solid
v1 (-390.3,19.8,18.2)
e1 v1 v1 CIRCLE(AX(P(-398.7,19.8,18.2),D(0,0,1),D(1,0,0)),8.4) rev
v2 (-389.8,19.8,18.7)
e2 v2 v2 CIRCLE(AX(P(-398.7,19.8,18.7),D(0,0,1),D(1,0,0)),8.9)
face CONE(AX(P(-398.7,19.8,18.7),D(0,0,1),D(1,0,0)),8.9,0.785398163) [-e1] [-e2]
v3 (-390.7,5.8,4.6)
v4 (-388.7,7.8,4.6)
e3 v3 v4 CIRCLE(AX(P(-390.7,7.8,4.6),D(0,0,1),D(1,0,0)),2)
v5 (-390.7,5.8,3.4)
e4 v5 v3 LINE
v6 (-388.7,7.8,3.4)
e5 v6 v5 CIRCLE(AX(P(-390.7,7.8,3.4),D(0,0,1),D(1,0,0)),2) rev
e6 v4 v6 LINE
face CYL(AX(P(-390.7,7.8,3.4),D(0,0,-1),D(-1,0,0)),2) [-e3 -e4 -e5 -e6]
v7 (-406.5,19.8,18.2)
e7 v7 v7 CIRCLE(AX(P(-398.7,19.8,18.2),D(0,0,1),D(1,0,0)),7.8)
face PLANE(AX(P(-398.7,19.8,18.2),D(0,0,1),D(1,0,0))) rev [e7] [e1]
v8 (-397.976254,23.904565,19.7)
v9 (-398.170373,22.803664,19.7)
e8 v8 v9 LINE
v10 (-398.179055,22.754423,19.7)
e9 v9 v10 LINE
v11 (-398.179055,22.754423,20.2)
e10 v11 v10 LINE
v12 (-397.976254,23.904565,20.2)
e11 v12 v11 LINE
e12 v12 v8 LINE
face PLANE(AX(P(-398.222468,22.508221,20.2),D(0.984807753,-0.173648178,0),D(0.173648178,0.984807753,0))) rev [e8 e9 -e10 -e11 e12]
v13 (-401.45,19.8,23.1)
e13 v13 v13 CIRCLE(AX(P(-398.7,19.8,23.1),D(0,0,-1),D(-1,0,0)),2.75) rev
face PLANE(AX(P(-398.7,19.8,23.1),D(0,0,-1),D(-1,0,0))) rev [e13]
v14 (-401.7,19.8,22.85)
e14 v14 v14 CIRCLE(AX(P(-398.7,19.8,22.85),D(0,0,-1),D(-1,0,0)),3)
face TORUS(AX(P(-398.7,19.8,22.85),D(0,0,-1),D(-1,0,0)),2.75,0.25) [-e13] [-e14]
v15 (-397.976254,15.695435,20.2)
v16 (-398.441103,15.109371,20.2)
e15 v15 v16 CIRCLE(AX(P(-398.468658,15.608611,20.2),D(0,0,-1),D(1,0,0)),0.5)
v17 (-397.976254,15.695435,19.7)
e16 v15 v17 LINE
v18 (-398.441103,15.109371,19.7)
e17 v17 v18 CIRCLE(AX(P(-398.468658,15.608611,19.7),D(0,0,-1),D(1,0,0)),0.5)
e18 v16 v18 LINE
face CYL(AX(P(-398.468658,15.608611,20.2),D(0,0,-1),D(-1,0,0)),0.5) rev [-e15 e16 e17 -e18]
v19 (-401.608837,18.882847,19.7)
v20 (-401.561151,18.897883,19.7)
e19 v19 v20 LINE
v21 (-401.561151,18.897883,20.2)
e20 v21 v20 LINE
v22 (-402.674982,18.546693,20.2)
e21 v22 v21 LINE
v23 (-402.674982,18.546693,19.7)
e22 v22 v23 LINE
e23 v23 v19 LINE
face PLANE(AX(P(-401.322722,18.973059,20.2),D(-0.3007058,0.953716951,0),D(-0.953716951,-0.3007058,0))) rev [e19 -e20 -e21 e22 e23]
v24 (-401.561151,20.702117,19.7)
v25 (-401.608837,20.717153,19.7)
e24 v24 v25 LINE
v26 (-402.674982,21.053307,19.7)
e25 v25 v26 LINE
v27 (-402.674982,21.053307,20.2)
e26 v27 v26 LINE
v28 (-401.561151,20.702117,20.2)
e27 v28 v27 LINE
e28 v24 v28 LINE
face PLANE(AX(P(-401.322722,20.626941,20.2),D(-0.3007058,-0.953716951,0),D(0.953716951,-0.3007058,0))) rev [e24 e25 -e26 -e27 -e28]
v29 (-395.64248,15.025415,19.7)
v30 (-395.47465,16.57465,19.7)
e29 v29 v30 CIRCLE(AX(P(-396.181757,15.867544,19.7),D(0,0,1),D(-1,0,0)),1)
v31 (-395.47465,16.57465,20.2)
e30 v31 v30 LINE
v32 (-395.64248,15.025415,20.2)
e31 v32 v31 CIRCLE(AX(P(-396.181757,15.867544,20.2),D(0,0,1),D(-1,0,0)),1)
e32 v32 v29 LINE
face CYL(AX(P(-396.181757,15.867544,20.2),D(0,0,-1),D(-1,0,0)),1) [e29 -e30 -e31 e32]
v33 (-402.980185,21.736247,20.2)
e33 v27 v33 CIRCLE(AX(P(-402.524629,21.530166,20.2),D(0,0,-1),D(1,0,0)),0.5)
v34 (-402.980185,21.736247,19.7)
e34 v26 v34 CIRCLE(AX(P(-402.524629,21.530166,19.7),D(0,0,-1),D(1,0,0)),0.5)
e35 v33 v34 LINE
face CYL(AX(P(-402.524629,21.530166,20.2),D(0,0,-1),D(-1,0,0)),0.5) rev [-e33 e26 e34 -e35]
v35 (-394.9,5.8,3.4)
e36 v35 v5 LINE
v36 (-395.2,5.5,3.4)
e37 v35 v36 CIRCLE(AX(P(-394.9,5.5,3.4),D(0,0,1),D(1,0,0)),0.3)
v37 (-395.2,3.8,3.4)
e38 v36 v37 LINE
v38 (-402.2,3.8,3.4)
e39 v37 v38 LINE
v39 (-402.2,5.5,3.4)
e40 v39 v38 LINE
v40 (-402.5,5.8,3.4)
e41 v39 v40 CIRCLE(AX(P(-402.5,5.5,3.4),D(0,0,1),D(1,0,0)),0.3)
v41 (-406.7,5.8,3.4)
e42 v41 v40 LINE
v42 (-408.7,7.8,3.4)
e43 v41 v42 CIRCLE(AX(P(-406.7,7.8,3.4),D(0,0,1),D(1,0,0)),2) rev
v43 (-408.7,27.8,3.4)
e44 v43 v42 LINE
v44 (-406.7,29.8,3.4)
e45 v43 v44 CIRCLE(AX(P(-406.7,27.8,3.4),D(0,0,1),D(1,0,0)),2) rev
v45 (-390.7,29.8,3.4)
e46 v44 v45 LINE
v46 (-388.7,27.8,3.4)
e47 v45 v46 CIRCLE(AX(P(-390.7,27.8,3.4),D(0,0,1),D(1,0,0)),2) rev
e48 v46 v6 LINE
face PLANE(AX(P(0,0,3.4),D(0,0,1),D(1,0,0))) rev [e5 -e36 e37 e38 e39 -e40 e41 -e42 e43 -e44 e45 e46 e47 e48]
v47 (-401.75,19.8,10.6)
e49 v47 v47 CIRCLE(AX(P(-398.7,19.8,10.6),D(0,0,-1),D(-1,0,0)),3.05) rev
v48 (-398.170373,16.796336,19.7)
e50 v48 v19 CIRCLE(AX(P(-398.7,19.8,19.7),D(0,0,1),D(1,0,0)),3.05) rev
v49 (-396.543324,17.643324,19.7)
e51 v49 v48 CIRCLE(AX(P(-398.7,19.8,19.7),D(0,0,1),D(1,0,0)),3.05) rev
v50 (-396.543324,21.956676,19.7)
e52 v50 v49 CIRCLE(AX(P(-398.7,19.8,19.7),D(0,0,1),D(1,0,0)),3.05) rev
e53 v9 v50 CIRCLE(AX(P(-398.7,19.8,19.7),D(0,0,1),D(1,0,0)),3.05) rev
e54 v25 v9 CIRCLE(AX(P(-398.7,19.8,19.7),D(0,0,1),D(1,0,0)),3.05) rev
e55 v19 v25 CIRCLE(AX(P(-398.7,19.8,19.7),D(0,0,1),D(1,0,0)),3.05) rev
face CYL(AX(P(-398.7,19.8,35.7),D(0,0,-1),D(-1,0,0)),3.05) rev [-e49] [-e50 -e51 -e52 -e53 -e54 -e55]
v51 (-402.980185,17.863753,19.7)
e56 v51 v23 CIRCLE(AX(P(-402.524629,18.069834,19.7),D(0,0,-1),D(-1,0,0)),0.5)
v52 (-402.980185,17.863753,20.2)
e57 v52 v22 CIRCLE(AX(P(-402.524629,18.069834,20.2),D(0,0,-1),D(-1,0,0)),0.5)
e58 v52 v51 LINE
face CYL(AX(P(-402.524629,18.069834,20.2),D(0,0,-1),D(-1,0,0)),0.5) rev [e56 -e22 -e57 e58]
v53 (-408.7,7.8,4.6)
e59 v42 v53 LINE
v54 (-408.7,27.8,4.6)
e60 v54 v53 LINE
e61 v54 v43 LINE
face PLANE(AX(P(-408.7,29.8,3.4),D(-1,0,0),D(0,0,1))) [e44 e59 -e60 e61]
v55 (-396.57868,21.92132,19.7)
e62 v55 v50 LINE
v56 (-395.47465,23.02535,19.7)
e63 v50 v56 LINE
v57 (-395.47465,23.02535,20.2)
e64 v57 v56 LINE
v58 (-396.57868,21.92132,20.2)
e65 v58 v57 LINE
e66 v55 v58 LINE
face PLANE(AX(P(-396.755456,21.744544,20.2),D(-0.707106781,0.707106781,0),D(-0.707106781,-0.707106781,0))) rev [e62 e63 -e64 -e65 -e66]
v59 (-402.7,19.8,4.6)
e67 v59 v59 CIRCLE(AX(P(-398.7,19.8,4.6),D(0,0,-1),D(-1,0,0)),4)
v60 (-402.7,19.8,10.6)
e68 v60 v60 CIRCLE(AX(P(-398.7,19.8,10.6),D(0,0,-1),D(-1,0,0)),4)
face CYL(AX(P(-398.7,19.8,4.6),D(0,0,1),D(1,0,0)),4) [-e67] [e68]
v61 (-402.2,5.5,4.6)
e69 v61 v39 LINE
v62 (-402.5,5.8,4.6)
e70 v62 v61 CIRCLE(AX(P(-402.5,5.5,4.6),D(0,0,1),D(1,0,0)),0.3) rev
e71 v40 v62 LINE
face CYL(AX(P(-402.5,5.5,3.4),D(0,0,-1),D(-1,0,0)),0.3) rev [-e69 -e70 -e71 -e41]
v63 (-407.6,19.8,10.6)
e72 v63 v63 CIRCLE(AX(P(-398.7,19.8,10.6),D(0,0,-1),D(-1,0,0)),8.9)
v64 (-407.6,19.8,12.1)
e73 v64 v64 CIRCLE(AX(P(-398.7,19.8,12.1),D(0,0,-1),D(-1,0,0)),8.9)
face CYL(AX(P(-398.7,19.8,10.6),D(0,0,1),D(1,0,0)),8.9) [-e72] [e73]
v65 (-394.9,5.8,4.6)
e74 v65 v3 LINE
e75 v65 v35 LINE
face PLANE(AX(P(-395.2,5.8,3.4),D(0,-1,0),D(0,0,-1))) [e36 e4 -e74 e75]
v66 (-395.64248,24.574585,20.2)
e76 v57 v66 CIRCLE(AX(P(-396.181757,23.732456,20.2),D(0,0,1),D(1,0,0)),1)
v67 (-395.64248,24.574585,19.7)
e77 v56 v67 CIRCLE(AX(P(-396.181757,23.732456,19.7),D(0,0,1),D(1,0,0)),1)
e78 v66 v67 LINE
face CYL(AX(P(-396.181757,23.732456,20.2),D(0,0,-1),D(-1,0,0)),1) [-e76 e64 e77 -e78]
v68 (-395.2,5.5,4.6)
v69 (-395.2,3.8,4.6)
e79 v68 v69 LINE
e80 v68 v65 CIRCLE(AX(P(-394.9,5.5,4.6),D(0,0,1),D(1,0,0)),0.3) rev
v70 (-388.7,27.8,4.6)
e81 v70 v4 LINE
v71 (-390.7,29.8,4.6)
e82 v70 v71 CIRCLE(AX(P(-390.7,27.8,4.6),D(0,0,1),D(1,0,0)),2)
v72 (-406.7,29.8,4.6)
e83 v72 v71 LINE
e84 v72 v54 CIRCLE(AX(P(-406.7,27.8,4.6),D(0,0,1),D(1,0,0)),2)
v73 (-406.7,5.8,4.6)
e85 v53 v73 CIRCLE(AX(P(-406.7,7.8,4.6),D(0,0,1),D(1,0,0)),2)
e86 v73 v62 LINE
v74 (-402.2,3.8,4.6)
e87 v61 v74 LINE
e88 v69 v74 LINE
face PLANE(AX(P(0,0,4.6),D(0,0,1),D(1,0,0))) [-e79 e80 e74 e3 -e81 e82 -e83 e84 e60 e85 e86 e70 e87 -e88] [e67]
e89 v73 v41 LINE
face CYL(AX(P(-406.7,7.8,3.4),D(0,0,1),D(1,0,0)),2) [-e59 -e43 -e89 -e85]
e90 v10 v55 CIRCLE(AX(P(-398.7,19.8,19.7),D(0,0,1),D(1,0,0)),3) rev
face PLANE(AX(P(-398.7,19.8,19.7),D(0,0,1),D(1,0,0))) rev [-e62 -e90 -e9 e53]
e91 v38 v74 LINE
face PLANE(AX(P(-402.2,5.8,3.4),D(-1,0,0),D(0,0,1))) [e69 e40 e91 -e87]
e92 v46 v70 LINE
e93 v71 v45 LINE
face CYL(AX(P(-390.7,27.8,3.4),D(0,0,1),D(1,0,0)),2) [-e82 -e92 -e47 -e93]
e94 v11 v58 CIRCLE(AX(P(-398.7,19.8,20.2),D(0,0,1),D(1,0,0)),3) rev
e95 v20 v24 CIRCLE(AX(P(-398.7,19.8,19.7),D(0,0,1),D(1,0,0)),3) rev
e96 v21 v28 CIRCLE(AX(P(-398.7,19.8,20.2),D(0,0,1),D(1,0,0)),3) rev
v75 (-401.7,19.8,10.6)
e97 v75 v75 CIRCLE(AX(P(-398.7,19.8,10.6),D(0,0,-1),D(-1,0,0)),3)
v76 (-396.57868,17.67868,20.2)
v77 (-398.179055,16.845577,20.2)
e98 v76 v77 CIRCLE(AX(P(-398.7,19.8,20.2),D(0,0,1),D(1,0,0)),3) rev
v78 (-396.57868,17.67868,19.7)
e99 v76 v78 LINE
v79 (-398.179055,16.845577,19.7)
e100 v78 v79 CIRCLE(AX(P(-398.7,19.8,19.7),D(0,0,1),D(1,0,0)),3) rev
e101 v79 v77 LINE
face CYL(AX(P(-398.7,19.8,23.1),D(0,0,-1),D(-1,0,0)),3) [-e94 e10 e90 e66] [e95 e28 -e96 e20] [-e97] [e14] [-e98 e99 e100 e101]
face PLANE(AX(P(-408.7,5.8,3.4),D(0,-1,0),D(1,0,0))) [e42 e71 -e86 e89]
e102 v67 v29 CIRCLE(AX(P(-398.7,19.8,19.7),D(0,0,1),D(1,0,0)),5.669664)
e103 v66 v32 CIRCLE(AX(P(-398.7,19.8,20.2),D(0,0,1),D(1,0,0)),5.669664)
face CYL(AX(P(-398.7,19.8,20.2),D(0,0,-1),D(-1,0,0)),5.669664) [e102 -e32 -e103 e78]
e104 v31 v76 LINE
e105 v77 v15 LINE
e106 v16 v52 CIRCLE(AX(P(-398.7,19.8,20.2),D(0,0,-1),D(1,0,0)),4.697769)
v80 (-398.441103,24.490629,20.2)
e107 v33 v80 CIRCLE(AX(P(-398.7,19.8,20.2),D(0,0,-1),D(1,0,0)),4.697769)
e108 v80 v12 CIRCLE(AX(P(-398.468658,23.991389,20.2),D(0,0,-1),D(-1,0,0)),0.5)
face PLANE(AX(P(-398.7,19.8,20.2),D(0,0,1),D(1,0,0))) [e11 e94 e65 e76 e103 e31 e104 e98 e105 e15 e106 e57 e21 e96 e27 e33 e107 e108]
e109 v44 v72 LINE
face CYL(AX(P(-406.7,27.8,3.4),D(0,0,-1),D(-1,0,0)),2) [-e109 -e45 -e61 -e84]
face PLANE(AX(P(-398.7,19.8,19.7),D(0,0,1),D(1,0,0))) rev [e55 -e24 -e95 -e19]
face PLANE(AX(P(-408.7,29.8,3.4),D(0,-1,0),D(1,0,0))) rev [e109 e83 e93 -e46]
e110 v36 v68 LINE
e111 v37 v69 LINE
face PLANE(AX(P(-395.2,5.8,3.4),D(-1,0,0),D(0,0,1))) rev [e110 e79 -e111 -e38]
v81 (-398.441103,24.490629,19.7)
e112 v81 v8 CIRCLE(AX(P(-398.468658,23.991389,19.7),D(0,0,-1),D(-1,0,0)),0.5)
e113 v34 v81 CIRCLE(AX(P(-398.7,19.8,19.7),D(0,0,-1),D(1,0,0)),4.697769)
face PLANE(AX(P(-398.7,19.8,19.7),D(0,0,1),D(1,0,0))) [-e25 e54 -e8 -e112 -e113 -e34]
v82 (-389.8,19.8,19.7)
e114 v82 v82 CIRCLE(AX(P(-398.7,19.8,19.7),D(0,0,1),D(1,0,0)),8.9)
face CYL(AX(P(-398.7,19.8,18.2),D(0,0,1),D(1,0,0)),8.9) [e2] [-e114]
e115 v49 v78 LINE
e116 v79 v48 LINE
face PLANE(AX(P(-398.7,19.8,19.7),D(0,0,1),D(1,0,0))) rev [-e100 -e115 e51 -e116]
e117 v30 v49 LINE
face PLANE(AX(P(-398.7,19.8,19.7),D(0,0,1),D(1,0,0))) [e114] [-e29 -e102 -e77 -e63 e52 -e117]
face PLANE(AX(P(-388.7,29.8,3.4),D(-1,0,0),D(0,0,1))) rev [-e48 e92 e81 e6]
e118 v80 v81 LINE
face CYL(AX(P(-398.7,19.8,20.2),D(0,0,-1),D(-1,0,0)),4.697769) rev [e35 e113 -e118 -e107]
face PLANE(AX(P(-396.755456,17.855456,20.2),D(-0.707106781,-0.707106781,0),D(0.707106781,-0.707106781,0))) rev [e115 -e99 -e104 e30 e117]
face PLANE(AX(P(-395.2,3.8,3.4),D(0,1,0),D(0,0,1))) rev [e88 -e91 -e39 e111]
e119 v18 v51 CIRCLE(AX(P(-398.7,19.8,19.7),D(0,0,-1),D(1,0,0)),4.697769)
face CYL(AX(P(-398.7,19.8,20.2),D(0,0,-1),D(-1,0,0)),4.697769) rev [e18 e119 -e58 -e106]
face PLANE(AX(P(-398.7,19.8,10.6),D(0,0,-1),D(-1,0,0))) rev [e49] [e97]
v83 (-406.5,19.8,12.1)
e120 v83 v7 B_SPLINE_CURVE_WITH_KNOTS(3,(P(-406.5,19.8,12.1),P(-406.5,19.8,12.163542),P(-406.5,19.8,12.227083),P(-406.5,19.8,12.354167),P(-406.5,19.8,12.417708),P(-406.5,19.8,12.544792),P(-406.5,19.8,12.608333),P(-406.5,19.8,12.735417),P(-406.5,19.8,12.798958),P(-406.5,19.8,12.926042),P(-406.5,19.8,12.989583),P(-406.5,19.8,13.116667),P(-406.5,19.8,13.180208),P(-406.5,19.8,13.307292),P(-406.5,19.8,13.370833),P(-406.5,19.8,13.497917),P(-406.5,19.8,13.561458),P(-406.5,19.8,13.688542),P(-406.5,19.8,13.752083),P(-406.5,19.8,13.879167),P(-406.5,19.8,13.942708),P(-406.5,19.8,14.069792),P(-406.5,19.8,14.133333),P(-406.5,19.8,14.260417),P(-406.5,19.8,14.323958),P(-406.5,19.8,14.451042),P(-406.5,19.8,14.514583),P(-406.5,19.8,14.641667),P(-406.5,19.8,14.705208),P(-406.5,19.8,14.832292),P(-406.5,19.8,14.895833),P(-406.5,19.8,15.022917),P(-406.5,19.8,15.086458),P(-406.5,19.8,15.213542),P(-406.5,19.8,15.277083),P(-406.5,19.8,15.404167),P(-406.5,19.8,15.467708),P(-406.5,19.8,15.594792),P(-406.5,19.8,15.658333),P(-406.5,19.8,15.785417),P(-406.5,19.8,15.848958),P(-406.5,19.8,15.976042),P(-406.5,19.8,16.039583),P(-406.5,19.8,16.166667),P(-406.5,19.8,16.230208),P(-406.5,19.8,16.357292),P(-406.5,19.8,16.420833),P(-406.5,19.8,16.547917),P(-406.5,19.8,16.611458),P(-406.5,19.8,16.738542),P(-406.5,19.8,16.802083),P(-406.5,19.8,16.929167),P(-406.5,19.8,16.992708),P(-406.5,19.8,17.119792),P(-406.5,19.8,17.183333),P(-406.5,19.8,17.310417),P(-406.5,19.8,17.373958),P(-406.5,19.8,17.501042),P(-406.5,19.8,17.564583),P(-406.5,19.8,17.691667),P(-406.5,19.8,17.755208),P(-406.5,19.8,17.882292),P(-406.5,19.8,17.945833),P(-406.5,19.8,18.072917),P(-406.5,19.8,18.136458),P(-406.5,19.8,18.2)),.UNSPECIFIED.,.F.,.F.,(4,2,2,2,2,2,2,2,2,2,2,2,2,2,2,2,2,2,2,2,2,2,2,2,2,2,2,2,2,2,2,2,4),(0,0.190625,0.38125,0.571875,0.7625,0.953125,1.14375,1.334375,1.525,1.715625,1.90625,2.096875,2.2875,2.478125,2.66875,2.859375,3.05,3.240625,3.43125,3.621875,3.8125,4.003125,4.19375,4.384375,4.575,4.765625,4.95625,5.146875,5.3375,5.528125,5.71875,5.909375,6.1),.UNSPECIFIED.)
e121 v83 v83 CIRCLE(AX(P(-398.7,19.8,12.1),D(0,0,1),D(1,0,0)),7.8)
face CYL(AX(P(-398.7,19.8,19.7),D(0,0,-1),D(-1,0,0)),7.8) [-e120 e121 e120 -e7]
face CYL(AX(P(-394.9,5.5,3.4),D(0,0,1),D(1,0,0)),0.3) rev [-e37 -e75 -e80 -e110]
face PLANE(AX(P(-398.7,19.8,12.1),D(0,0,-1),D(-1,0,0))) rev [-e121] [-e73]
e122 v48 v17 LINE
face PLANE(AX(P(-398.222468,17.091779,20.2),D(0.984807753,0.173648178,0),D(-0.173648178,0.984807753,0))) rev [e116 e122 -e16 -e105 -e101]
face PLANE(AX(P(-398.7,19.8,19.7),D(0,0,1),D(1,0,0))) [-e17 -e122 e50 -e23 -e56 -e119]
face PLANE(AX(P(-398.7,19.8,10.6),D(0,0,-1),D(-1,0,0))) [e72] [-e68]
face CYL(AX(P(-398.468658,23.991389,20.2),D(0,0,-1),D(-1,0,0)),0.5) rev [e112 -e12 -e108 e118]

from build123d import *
from OCP.BRepFilletAPI import BRepFilletAPI_MakeChamfer

# Parameters (mm, degrees)
ESBO_O1_W                  = 97.4
ESBO_O1_H                  = 1.25
RESSALTO_EXTRUS_O1_DEPTH   = 6.2
ESBO_O2_W                  = 97.4
ESBO_O2_H                  = 1.25
RESSALTO_EXTRUS_O2_DEPTH   = 40.6
FILETE1_R                  = 1
ESBO_O3_R                  = 2
ESBO_O3_R_2                = 2.5
ESBO_O3_R_3                = 6
ESBO_O3_W                  = 4
ESBO_O3_H                  = 6
ESBO_O3_W_2                = 6
ESBO_O3_H_2                = 8
CORTE_EXTRUS_O1_DEPTH      = 40.6
ESBO_O6_R                  = 3
RESSALTO_EXTRUS_O3_DEPTH   = 22.5
ESBO_O7_R                  = 2.25
RESSALTO_EXTRUS_O4_DEPTH   = 12.3
FILETE2_R                  = 0.25
ESBO_O12_R                 = 4
RESSALTO_EXTRUS_O7_DEPTH   = 3
ESBO_O13_R                 = 4.5
RESSALTO_EXTRUS_O8_DEPTH   = 8.1
ESBO_O8_R                  = 16.365
ESBO_O8_R_2                = 2.3
RESSALTO_EXTRUS_O5_DEPTH   = 4
ESBO_O9_R                  = 4
ESBO_O9_R_2                = 2.3
RESSALTO_EXTRUS_O6_DEPTH   = 8.9
ESBO_O10_R                 = 13.865
ESBO_O10_R_2               = 4.9
CORTE_EXTRUS_O2_DEPTH      = 1
CORTE_EXTRUS_O3_START      = -1
ESBO_O11_R                 = 13.86
ESBO_O11_R_2               = 4.9
CORTE_EXTRUS_O3_DEPTH      = 1
ESBO_O14_R                 = 18.34
ESBO_O14_R_2               = 3.1
RESSALTO_EXTRUS_O9_DEPTH   = 4
ESBO_O15_R                 = 7.8
ESBO_O15_R_2               = 3.1
RESSALTO_EXTRUS_O10_DEPTH  = 11.6
RESSALTO_EXTRUS_O11_START  = -1.5
ESBO_O16_R                 = 8.9
ESBO_O16_R_2               = 3.1
RESSALTO_EXTRUS_O11_DEPTH  = 1.5
CHANFRO1_SIZE              = 0.5
ESBO_O17_R                 = 3.5
ESBO_O17_R_2               = 3.1
RESSALTO_EXTRUS_O12_DEPTH  = 0.5
CORTE_EXTRUS_O4_START      = -1
ESBO_O18_R                 = 15.84
ESBO_O18_R_2               = 8.9
CORTE_EXTRUS_O4_DEPTH      = 1
ESBO_O19_R                 = 15.825
ESBO_O19_R_2               = 8.9
CORTE_EXTRUS_O5_DEPTH      = 1
RESSALTO_EXTRUS_O13_DEPTH  = 0.5
ESBO_O21_R                 = 1.75
RESSALTO_EXTRUS_O14_DEPTH  = 0.92
ESBO_O23_R                 = 17.675026778
RESSALTO_EXTRUS_O15_DEPTH  = 15
FILETE4_R                  = 1
ESBO_O24_R                 = 2.05
ESBO_O24_R_2               = 1.75
RESSALTO_EXTRUS_O16_DEPTH  = 1
ESBO_O25_R                 = 2.5
RESSALTO_EXTRUS_O17_DEPTH  = 0.1
ESBO_O26_R                 = 1
RESSALTO_EXTRUS_O18_DEPTH  = 0.5
FILETE6_R                  = 0.1
ESBO_O27_R                 = 4.99
RESSALTO_EXTRUS_O19_DEPTH  = 16.57
RESSALTO_EXTRUS_O20_START  = -25
ESBO_O28_R                 = 1
RESSALTO_EXTRUS_O20_DEPTH  = 25
FILETE5_R                  = 0.25
ESBO_O29_R                 = 3.59
RESSALTO_EXTRUS_O21_DEPTH  = 6
ESBO_O30_R                 = 2.7
RESSALTO_EXTRUS_O22_DEPTH  = 2
FILETE7_R                  = 1.4
CORTE_EXTRUS_O6_DEPTH      = 1.4
ESBO_O32_R                 = 1.75
RESSALTO_EXTRUS_O23_DEPTH  = 7.8
CHANFRO2_SIZE              = 1
CHANFRO2_SIZE2             = 0.466307658
RESSALTO_EXTRUS_O24_DEPTH  = 10
ESBO_O34_R                 = 2
RESSALTO_EXTRUS_O25_DEPTH  = 5
ESBO_O35_R                 = 7.8
RESSALTO_EXTRUS_O26_DEPTH  = 7.6
ESBO_O37_R                 = 8.9
RESSALTO_EXTRUS_O27_DEPTH  = 1.5
CHANFRO3_SIZE              = 0.5
ESBO_O38_R                 = 8.9
RESSALTO_EXTRUS_O28_DEPTH  = 1.5
CORTE_EXTRUS_O7_DEPTH      = 16
CORTE_EXTRUS_O7_DEPTH_BACK = 35.5
ESBO_O39_R                 = 3.05
ESBO_O40_R                 = 4
RESSALTO_EXTRUS_O29_DEPTH  = 6
ESBO_O41_R                 = 3
RESSALTO_EXTRUS_O30_DEPTH  = 18.5
FILETE8_R                  = 0.25
RESSALTO_EXTRUS_O31_DEPTH  = 0.5
RESSALTO_EXTRUS_O32_DEPTH  = 1.2
FILETE9_R                  = 2
FILETE10_R                 = 0.3
FILETE11_R                 = 0.5
FILETE12_R                 = 0.25


with BuildPart() as part:
    # Esboço1 → Ressalto-extrusão1 (new body)
    with BuildSketch(Plane.XY):
        Rectangle(ESBO_O1_W, ESBO_O1_H)
    extrude(amount=RESSALTO_EXTRUS_O1_DEPTH)

    # Esboço2 → Ressalto-extrusão2 (add)
    with BuildSketch(Plane(origin=(0, -0.625, 0), x_dir=(1, 0, 0), z_dir=(0, 1, 0))):
        with Locations((0, -0.625)):
            Rectangle(ESBO_O2_W, ESBO_O2_H)
    extrude(amount=RESSALTO_EXTRUS_O2_DEPTH)

    # Filete1
    filete1_edges = [part.edges().sort_by_distance(p)[0] for p in [
        (48.7, 0, 6.2),
        (48.7, 39.975, 0.625),
        (-48.7, 39.975, 0.625),
        (-48.7, 0, 6.2),
    ]]
    fillet(filete1_edges, radius=FILETE1_R)

    # Esboço3 → Corte-extrusão1 (cut)
    with BuildSketch(Plane.XY.offset(1.25)):
        with Locations((-43.7, 4.975)):
            Circle(ESBO_O3_R)
        with Locations((0, 4.975)):
            Circle(ESBO_O3_R)
        with Locations((38.95, 19.8)):
            Circle(ESBO_O3_R_2)
        with Locations((14.7, 19.8)):
            Circle(ESBO_O3_R_3)
        with Locations((41.7, 30.975)):
            Rectangle(ESBO_O3_W, ESBO_O3_H)
        with Locations((41.7, 8.975)):
            Rectangle(ESBO_O3_W, ESBO_O3_H)
        with Locations((-33.7, 8.975)):
            Rectangle(ESBO_O3_W_2, ESBO_O3_H_2)
        with BuildLine():
            Line((27.7, 36.975), (30.7, 36.975))
            ThreePointArc((30.7, 36.975), (32.7, 34.975), (30.7, 32.975))
            Line((30.7, 32.975), (27.7, 32.975))
            ThreePointArc((27.7, 32.975), (25.7, 34.975), (27.7, 36.975))
        make_face()
        with Locations((-33.7, 30.975)):
            Rectangle(ESBO_O3_W_2, ESBO_O3_H_2)
    extrude(amount=-CORTE_EXTRUS_O1_DEPTH, mode=Mode.SUBTRACT)

    # Esboço6 → Ressalto-extrusão3 (add)
    with BuildSketch(Plane(origin=(0, 0, 0), x_dir=(-1, 0, 0), z_dir=(0, 0, -1))):
        with Locations((25.7, 19.8)):
            Circle(ESBO_O6_R)
    extrude(amount=-RESSALTO_EXTRUS_O3_DEPTH)

    # Esboço7 → Ressalto-extrusão4 (add)
    with BuildSketch(Plane(origin=(0, 0, 0), x_dir=(-1, 0, 0), z_dir=(0, 0, -1))):
        with Locations((4.1, 23.975)):
            Circle(ESBO_O7_R)
    extrude(amount=-RESSALTO_EXTRUS_O4_DEPTH)

    # Filete2
    filete2_edges = [part.edges().sort_by_distance(p)[0] for p in [
        (-22.7, 19.8, 22.5),
        (-1.85, 23.975, 12.3),
    ]]
    fillet(filete2_edges, radius=FILETE2_R)

    # Esboço12 → Ressalto-extrusão7 (add)
    with BuildSketch(Plane.XY):
        with Locations(Location((-4.1, 23.975, 0), (0, 0, 180))):
            Circle(ESBO_O12_R)
    extrude(amount=RESSALTO_EXTRUS_O7_DEPTH)

    # Esboço13 → Ressalto-extrusão8 (add)
    with BuildSketch(Plane(origin=(0, 0, 0), x_dir=(-1, 0, 0), z_dir=(0, 0, -1))):
        with Locations((25.7, 19.8)):
            Circle(ESBO_O13_R)
    extrude(amount=-RESSALTO_EXTRUS_O8_DEPTH)

    # Esboço8 → Ressalto-extrusão5 (add)
    with BuildSketch(Plane.XY.offset(3)):
        with Locations((-4.1, 23.975)):
            Circle(ESBO_O8_R)
        with Locations((-4.1, 23.975)):
            Circle(ESBO_O8_R_2, mode=Mode.SUBTRACT)
    extrude(amount=RESSALTO_EXTRUS_O5_DEPTH)

    # Esboço9 → Ressalto-extrusão6 (add)
    with BuildSketch(Plane.XY.offset(3)):
        with Locations(Location((-4.1, 23.975, 0), (0, 0, 180))):
            Circle(ESBO_O9_R)
        with Locations((-4.1, 23.975)):
            Circle(ESBO_O9_R_2, mode=Mode.SUBTRACT)
    extrude(amount=RESSALTO_EXTRUS_O6_DEPTH)

    # Esboço10 → Corte-extrusão2 (cut)
    with BuildSketch(Plane.XY.offset(7)):
        with Locations((-4.1, 23.975)):
            Circle(ESBO_O10_R)
        with Locations((-4.1, 23.975)):
            Circle(ESBO_O10_R_2, mode=Mode.SUBTRACT)
    extrude(amount=-CORTE_EXTRUS_O2_DEPTH, mode=Mode.SUBTRACT)

    # Esboço11 → Corte-extrusão3 (cut)
    with BuildSketch(Plane(origin=(0, 0, 3), x_dir=(-1, 0, 0), z_dir=(0, 0, -1)).offset(CORTE_EXTRUS_O3_START)):
        with Locations((4.1, 23.975)):
            Circle(ESBO_O11_R)
        with Locations(Location((4.1, 23.975, 0), (0, 0, 180))):
            Circle(ESBO_O11_R_2, mode=Mode.SUBTRACT)
    extrude(amount=CORTE_EXTRUS_O3_DEPTH, mode=Mode.SUBTRACT)

    # Esboço14 → Ressalto-extrusão9 (add)
    with BuildSketch(Plane.XY.offset(8.1)):
        with Locations(Location((-25.7, 19.8, 0), (0, 0, 15.545528491))):
            Circle(ESBO_O14_R)
        with Locations((-25.7, 19.8)):
            Circle(ESBO_O14_R_2, mode=Mode.SUBTRACT)
    extrude(amount=RESSALTO_EXTRUS_O9_DEPTH)

    # Esboço15 → Ressalto-extrusão10 (add)
    with BuildSketch(Plane.XY.offset(8.1)):
        with Locations((-25.7, 19.8)):
            Circle(ESBO_O15_R)
        with Locations((-25.7, 19.8)):
            Circle(ESBO_O15_R_2, mode=Mode.SUBTRACT)
    extrude(amount=RESSALTO_EXTRUS_O10_DEPTH)

    # Esboço16 → Ressalto-extrusão11 (add)
    with BuildSketch(Plane.XY.offset(19.7).offset(RESSALTO_EXTRUS_O11_START)):
        with Locations((-25.7, 19.8)):
            Circle(ESBO_O16_R)
        with Locations((-25.7, 19.8)):
            Circle(ESBO_O16_R_2, mode=Mode.SUBTRACT)
    extrude(amount=RESSALTO_EXTRUS_O11_DEPTH)

    # Chanfro1
    chanfro1_edges = [part.edges().sort_by_distance(p)[0] for p in [
        (-34.6, 19.8, 18.2),
    ]]
    chamfer(chanfro1_edges, length=CHANFRO1_SIZE)

    # Esboço17 → Ressalto-extrusão12 (add)
    with BuildSketch(Plane.XY.offset(19.7)):
        with Locations((-25.7, 19.8)):
            Circle(ESBO_O17_R)
        with Locations((-25.7, 19.8)):
            Circle(ESBO_O17_R_2, mode=Mode.SUBTRACT)
    extrude(amount=RESSALTO_EXTRUS_O12_DEPTH)

    # Esboço18 → Corte-extrusão4 (cut)
    with BuildSketch(Plane.XY.offset(12.1).offset(CORTE_EXTRUS_O4_START)):
        with Locations((-25.7, 19.8)):
            Circle(ESBO_O18_R)
        with Locations((-25.7, 19.8)):
            Circle(ESBO_O18_R_2, mode=Mode.SUBTRACT)
    extrude(amount=CORTE_EXTRUS_O4_DEPTH, mode=Mode.SUBTRACT)

    # Esboço19 → Corte-extrusão5 (cut)
    with BuildSketch(Plane(origin=(0, 0, 8.1), x_dir=(-1, 0, 0), z_dir=(0, 0, -1))):
        with Locations((25.7, 19.8)):
            Circle(ESBO_O19_R)
        with Locations(Location((25.7, 19.8, 0), (0, 0, 180))):
            Circle(ESBO_O19_R_2, mode=Mode.SUBTRACT)
    extrude(amount=-CORTE_EXTRUS_O5_DEPTH, mode=Mode.SUBTRACT)

    # Esboço20 → Ressalto-extrusão13 (add)
    with BuildSketch(Plane.XY.offset(20.2)):
        with BuildLine():
            Line((-28.322721615, 20.626940949), (-29.67498238, 21.05330713))
            ThreePointArc((-29.67498238, 21.05330713), (-29.981119219, 21.326162864), (-29.980184512, 21.736247175))
            ThreePointArc((-29.980184512, 21.736247175), (-28.137076875, 23.816178393), (-25.441102958, 24.490629478))
            ThreePointArc((-25.441102958, 24.490629478), (-25.076922131, 24.302102712), (-24.9762544, 23.904565262))
            Line((-24.9762544, 23.904565262), (-25.222467511, 22.508221321))
            ThreePointArc((-25.222467511, 22.508221321), (-24.430191314, 22.239279791), (-23.755456352, 21.744543648))
            Line((-23.755456352, 21.744543648), (-22.474650348, 23.025349652))
            ThreePointArc((-22.474650348, 23.025349652), (-22.187573749, 23.840156974), (-22.642480013, 24.574584803))
            ThreePointArc((-22.642480013, 24.574584803), (-31.36966388, 19.8), (-22.642480013, 15.025415197))
            ThreePointArc((-22.642480013, 15.025415197), (-22.187573749, 15.759843026), (-22.474650348, 16.574650348))
            Line((-22.474650348, 16.574650348), (-23.755456352, 17.855456352))
            ThreePointArc((-23.755456352, 17.855456352), (-24.430191314, 17.360720209), (-25.222467511, 17.091778679))
            Line((-25.222467511, 17.091778679), (-24.9762544, 15.695434738))
            ThreePointArc((-24.9762544, 15.695434738), (-25.076922131, 15.297897288), (-25.441102958, 15.109370522))
            ThreePointArc((-25.441102958, 15.109370522), (-28.137076875, 15.783821607), (-29.980184512, 17.863752825))
            ThreePointArc((-29.980184512, 17.863752825), (-29.981119219, 18.273837136), (-29.67498238, 18.54669287))
            Line((-29.67498238, 18.54669287), (-28.322721615, 18.973059051))
            ThreePointArc((-28.322721615, 18.973059051), (-28.45, 19.8), (-28.322721615, 20.626940949))
        make_face()
    extrude(amount=RESSALTO_EXTRUS_O13_DEPTH)

    # Esboço21 → Ressalto-extrusão14 (add)
    with BuildSketch(Plane(origin=(0, 0, 0), x_dir=(-1, 0, 0), z_dir=(0, 0, -1))):
        with BuildLine():
            Line((3.595164465, 5.161527392), (2.779555471, 20.88173038))
            ThreePointArc((2.779555471, 20.88173038), (-2.196938457, 32.222448714), (-13.433733778, 37.429349428))
            Line((-13.433733778, 37.429349428), (-29.134017665, 38.565609025))
            ThreePointArc((-29.134017665, 38.565609025), (-31.845866586, 37.610857858), (-32.993876913, 34.975))
            Line((-32.993876913, 34.975), (-32.993876913, 30.076020514))
            Line((-32.993876913, 30.076020514), (-30.487753652, 27.518219171))
            ThreePointArc((-30.487753652, 27.518219171), (-27.196938457, 7.727551286), (-7.477551833, 4.033530282))
            Line((-7.477551833, 4.033530282), (-4.87273477, 1.375))
            Line((-4.87273477, 1.375), (0, 1.375))
            ThreePointArc((0, 1.375), (2.610699007, 2.49624009), (3.595164465, 5.161527392))
        make_face()
        with Locations((0, 4.975)):
            Circle(ESBO_O21_R, mode=Mode.SUBTRACT)
        with Locations((-29.393876913, 34.975)):
            Circle(ESBO_O21_R, mode=Mode.SUBTRACT)
    extrude(amount=RESSALTO_EXTRUS_O14_DEPTH)

    # Esboço23 → Ressalto-extrusão15 (add)
    with BuildSketch(Plane.XY):
        with Locations((14.7, 19.8)):
            Circle(ESBO_O23_R)
    extrude(amount=-RESSALTO_EXTRUS_O15_DEPTH)

    # Filete4
    filete4_edges = [part.edges().sort_by_distance(p)[0] for p in [
        (-2.975026778, 19.8, -15),
    ]]
    fillet(filete4_edges, radius=FILETE4_R)

    # Esboço24 → Ressalto-extrusão16 (add)
    # profile 1 of 2: a face of its own
    with BuildSketch(Plane(origin=(0, 0, -0.92), x_dir=(-1, 0, 0), z_dir=(0, 0, -1))):
        with Locations((0, 4.975)):
            Circle(ESBO_O24_R)
        with Locations((0, 4.975)):
            Circle(ESBO_O24_R_2, mode=Mode.SUBTRACT)
    # profile 2 of 2: a face of its own
    with BuildSketch(Plane(origin=(0, 0, -0.92), x_dir=(-1, 0, 0), z_dir=(0, 0, -1))):
        with Locations((-29.393876913, 34.975)):
            Circle(ESBO_O24_R)
        with Locations((-29.393876913, 34.975)):
            Circle(ESBO_O24_R_2, mode=Mode.SUBTRACT)
    extrude(amount=RESSALTO_EXTRUS_O16_DEPTH)

    # Esboço25 → Ressalto-extrusão17 (add)
    with BuildSketch(Plane(origin=(0, 0, -15), x_dir=(-1, 0, 0), z_dir=(0, 0, -1))):
        with Locations(Location((-14.7, 19.8, 0), (0, 0, 180))):
            Circle(ESBO_O25_R)
    extrude(amount=RESSALTO_EXTRUS_O17_DEPTH)

    # Esboço26 → Ressalto-extrusão18 (add)
    with BuildSketch(Plane(origin=(0, 0, -15.1), x_dir=(-1, 0, 0), z_dir=(0, 0, -1))):
        with Locations((-14.7, 19.8)):
            Circle(ESBO_O26_R)
    extrude(amount=RESSALTO_EXTRUS_O18_DEPTH)

    # Filete6
    filete6_edges = [part.edges().sort_by_distance(p)[0] for p in [
        (12.2, 19.8, -15.1),
    ]]
    fillet(filete6_edges, radius=FILETE6_R - 0.0001)  # a hair under: the kernel refuses the full size

    # Esboço27 → Ressalto-extrusão19 (add)
    with BuildSketch(Plane.XY.offset(-15)):
        with Locations(Location((14.7, 19.8, 0), (0, 0, 180))):
            Circle(ESBO_O27_R)
    extrude(amount=RESSALTO_EXTRUS_O19_DEPTH)

    # Esboço28 → Ressalto-extrusão20 (add)
    with BuildSketch(Plane(origin=(0, 0, -15.6), x_dir=(-1, 0, 0), z_dir=(0, 0, -1)).offset(RESSALTO_EXTRUS_O20_START)):
        with Locations((-14.7, 19.8)):
            Circle(ESBO_O28_R)
    extrude(amount=RESSALTO_EXTRUS_O20_DEPTH)

    # Filete5
    filete5_edges = [part.edges().sort_by_distance(p)[0] for p in [
        (15.7, 19.8, -15.6),
        (15.7, 19.8, 9.4),
    ]]
    fillet(filete5_edges, radius=FILETE5_R)

    # Esboço29 → Ressalto-extrusão21 (add)
    with BuildSketch(Plane.XY.offset(9.15)):
        with Locations((14.7, 19.8)):
            Circle(ESBO_O29_R)
    extrude(amount=-RESSALTO_EXTRUS_O21_DEPTH)

    # Esboço30 → Ressalto-extrusão22 (add)
    with BuildSketch(Plane.XY.offset(1.25)):
        with Locations(Location((0, 4.975, 0), (0, 0, 180))):
            Circle(ESBO_O30_R)
        with Locations(Location((29.393876913, 34.975, 0), (0, 0, 227.672748848))):
            Circle(ESBO_O30_R)
    extrude(amount=RESSALTO_EXTRUS_O22_DEPTH)

    # Filete7
    filete7_edges = [part.edges().sort_by_distance(p)[0] for p in [
        (2.7, 4.975, 3.25),
        (31.211960314, 36.971139461, 3.25),
    ]]
    fillet(filete7_edges, radius=FILETE7_R)

    # Esboço31 → Corte-extrusão6 (cut)
    with BuildSketch(Plane.XY.offset(3.25)):
        with BuildLine():
            Line((29.093876913, 37.175), (29.693876913, 37.175))
            ThreePointArc((29.693876913, 37.175), (29.83529827, 37.116421356), (29.893876913, 36.975))
            Line((29.893876913, 36.975), (29.893876913, 35.975))
            ThreePointArc((29.893876913, 35.975), (30.040323523, 35.621446609), (30.393876913, 35.475))
            Line((30.393876913, 35.475), (31.393876913, 35.475))
            ThreePointArc((31.393876913, 35.475), (31.53529827, 35.416421356), (31.593876913, 35.275))
            Line((31.593876913, 35.275), (31.593876913, 34.675))
            ThreePointArc((31.593876913, 34.675), (31.53529827, 34.533578644), (31.393876913, 34.475))
            Line((31.393876913, 34.475), (30.393876913, 34.475))
            ThreePointArc((30.393876913, 34.475), (30.040323523, 34.328553391), (29.893876913, 33.975))
            Line((29.893876913, 33.975), (29.893876913, 32.975))
            ThreePointArc((29.893876913, 32.975), (29.83529827, 32.833578644), (29.693876913, 32.775))
            Line((29.693876913, 32.775), (29.093876913, 32.775))
            ThreePointArc((29.093876913, 32.775), (28.952455557, 32.833578644), (28.893876913, 32.975))
            Line((28.893876913, 32.975), (28.893876913, 33.975))
            ThreePointArc((28.893876913, 33.975), (28.747430304, 34.328553391), (28.393876913, 34.475))
            Line((28.393876913, 34.475), (27.393876913, 34.475))
            ThreePointArc((27.393876913, 34.475), (27.252455557, 34.533578644), (27.193876913, 34.675))
            Line((27.193876913, 34.675), (27.193876913, 35.275))
            ThreePointArc((27.193876913, 35.275), (27.252455557, 35.416421356), (27.393876913, 35.475))
            Line((27.393876913, 35.475), (28.393876913, 35.475))
            ThreePointArc((28.393876913, 35.475), (28.747430304, 35.621446609), (28.893876913, 35.975))
            Line((28.893876913, 35.975), (28.893876913, 36.975))
            ThreePointArc((28.893876913, 36.975), (28.952455557, 37.116421356), (29.093876913, 37.175))
        make_face()
        with BuildLine():
            Line((-0.142061447, 7.325028719), (0.457938553, 7.325028719))
            ThreePointArc((0.457938553, 7.325028719), (0.59935991, 7.266450075), (0.657938553, 7.125028719))
            Line((0.657938553, 7.125028719), (0.657938553, 6.125028719))
            ThreePointArc((0.657938553, 6.125028719), (0.804385163, 5.771475328), (1.157938553, 5.625028719))
            Line((1.157938553, 5.625028719), (2.157938553, 5.625028719))
            ThreePointArc((2.157938553, 5.625028719), (2.29935991, 5.566450075), (2.357938553, 5.425028719))
            Line((2.357938553, 5.425028719), (2.357938553, 4.825028719))
            ThreePointArc((2.357938553, 4.825028719), (2.29935991, 4.683607363), (2.157938553, 4.625028719))
            Line((2.157938553, 4.625028719), (1.157938553, 4.625028719))
            ThreePointArc((1.157938553, 4.625028719), (0.804385163, 4.478582109), (0.657938553, 4.125028719))
            Line((0.657938553, 4.125028719), (0.657938553, 3.125028719))
            ThreePointArc((0.657938553, 3.125028719), (0.59935991, 2.983607363), (0.457938553, 2.925028719))
            Line((0.457938553, 2.925028719), (-0.142061447, 2.925028719))
            ThreePointArc((-0.142061447, 2.925028719), (-0.283482803, 2.983607363), (-0.342061447, 3.125028719))
            Line((-0.342061447, 3.125028719), (-0.342061447, 4.125028719))
            ThreePointArc((-0.342061447, 4.125028719), (-0.488508056, 4.478582109), (-0.842061447, 4.625028719))
            Line((-0.842061447, 4.625028719), (-1.842061447, 4.625028719))
            ThreePointArc((-1.842061447, 4.625028719), (-1.983482803, 4.683607363), (-2.042061447, 4.825028719))
            Line((-2.042061447, 4.825028719), (-2.042061447, 5.425028719))
            ThreePointArc((-2.042061447, 5.425028719), (-1.983482803, 5.566450075), (-1.842061447, 5.625028719))
            Line((-1.842061447, 5.625028719), (-0.842061447, 5.625028719))
            ThreePointArc((-0.842061447, 5.625028719), (-0.488508056, 5.771475328), (-0.342061447, 6.125028719))
            Line((-0.342061447, 6.125028719), (-0.342061447, 7.125028719))
            ThreePointArc((-0.342061447, 7.125028719), (-0.283482803, 7.266450075), (-0.142061447, 7.325028719))
        make_face()
    extrude(amount=-CORTE_EXTRUS_O6_DEPTH, mode=Mode.SUBTRACT)

    # Esboço32 → Ressalto-extrusão23 (add)
    with BuildSketch(Plane(origin=(0, 0, 1.25), x_dir=(-1, 0, 0), z_dir=(0, 0, -1))):
        with Locations((0, 4.975)):
            Circle(ESBO_O32_R)
        with Locations(Location((-29.393876913, 34.975, 0), (0, 0, 180))):
            Circle(ESBO_O32_R)
    extrude(amount=RESSALTO_EXTRUS_O23_DEPTH)

    # Chanfro2: one chamfer whose edges measure the first distance from different faces: ONE call of the kernel's chamfer builder (chamfer() names one face for all edges)
    chanfro2_edges_1 = [part.edges().sort_by_distance(p)[0] for p in [
        (1.75, 4.975, -6.55),
    ]]
    chanfro2_side_1 = [part.faces().sort_by_distance(p)[0] for p in [
        (1.75, 4.975, -4.235),
    ]]
    chanfro2_edges_2 = [part.edges().sort_by_distance(p)[0] for p in [
        (27.643876913, 34.975, -6.55),
    ]]
    chanfro2_side_2 = [part.faces().sort_by_distance(p)[0] for p in [
        (27.643876913, 34.975, -4.235),
    ]]
    chanfro2 = BRepFilletAPI_MakeChamfer(part.part.solid().wrapped)
    for e in chanfro2_edges_1:
        chanfro2.Add(CHANFRO2_SIZE, CHANFRO2_SIZE2, e.wrapped, chanfro2_side_1[0].wrapped)  # the first distance lies on this face
    for e in chanfro2_edges_2:
        chanfro2.Add(CHANFRO2_SIZE, CHANFRO2_SIZE2, e.wrapped, chanfro2_side_2[0].wrapped)  # the first distance lies on this face
    add(Compound.cast(chanfro2.Shape()), mode=Mode.REPLACE)

    # Esboço33 → Ressalto-extrusão24 (add)
    with BuildSketch(Plane(origin=(0, 0, -0.92), x_dir=(-1, 0, 0), z_dir=(0, 0, -1))):
        with BuildLine():
            Line((3.196311276, 12.849099671), (3.224269109, 12.846096875))
            Line((3.224269109, 12.846096875), (4.292171901, 22.788912554))
            Line((4.292171901, 22.788912554), (2.690076099, 22.960984796))
            ThreePointArc((2.690076099, 22.960984796), (2.95476648, 20.646044994), (2.912651997, 18.316402606))
            Line((2.912651997, 18.316402606), (3.196311276, 12.849099671))
        make_face()
        with BuildLine():
            Line((1.622173307, 13.018169117), (3.196311276, 12.849099671))
            Line((3.196311276, 12.849099671), (2.912651997, 18.316402606))
            ThreePointArc((2.912651997, 18.316402606), (2.472970379, 15.617218633), (1.622173307, 13.018169117))
        make_face()
    extrude(amount=RESSALTO_EXTRUS_O24_DEPTH)

    # Esboço34 → Ressalto-extrusão25 (add)
    with BuildSketch(Plane(origin=(-1.823505509, -0.195852632, 0), x_dir=(0, 0, 1), z_dir=(-0.9942815679049348, -0.10679027916671441, 0))):
        with Locations(Location((-5.92, 18.116957941, 0), (0, 0, 270))):
            Circle(ESBO_O34_R)
    extrude(amount=RESSALTO_EXTRUS_O25_DEPTH)

    # Filete11
    filete11_edges = [part.edges().sort_by_distance(p)[0] for p in [
        (0, -0.625, 0),
    ]]
    fillet(filete11_edges, radius=FILETE11_R)

    # Filete12
    filete12_edges = [part.edges().sort_by_distance(p)[0] for p in [
        (0, 0.625, 1.25),
    ]]
    fillet(filete12_edges, radius=FILETE12_R)


with BuildPart() as body_2:
    # Esboço35 → Ressalto-extrusão26 (new body)
    with BuildSketch(Plane.XY.offset(12.1)):
        with Locations(Location((-398.7, 19.8, 0), (0, 0, 180))):
            Circle(ESBO_O35_R)
    extrude(amount=RESSALTO_EXTRUS_O26_DEPTH)

    # Esboço37 → Ressalto-extrusão27 (add)
    with BuildSketch(Plane.XY.offset(19.7)):
        with Locations((-398.7, 19.8)):
            Circle(ESBO_O37_R)
    extrude(amount=-RESSALTO_EXTRUS_O27_DEPTH)

    # Chanfro3
    chanfro3_edges = [body_2.edges().sort_by_distance(p)[0] for p in [
        (-407.6, 19.8, 18.2),
    ]]
    chamfer(chanfro3_edges, length=CHANFRO3_SIZE)

    # Esboço38 → Ressalto-extrusão28 (add)
    with BuildSketch(Plane(origin=(0, 0, 12.1), x_dir=(-1, 0, 0), z_dir=(0, 0, -1))):
        with Locations(Location((398.7, 19.8, 0), (0, 0, 180))):
            Circle(ESBO_O38_R)
    extrude(amount=RESSALTO_EXTRUS_O28_DEPTH)

    # Esboço39 → Corte-extrusão7 (cut, two sides: drawn at the far end of the back side and taken through both)
    with BuildSketch(Plane.XY.offset(19.7).offset(-CORTE_EXTRUS_O7_DEPTH_BACK)):
        with Locations(Location((-398.7, 19.8, 0), (0, 0, 180))):
            Circle(ESBO_O39_R)
    extrude(amount=CORTE_EXTRUS_O7_DEPTH + CORTE_EXTRUS_O7_DEPTH_BACK, mode=Mode.SUBTRACT)

    # Esboço40 → Ressalto-extrusão29 (add)
    with BuildSketch(Plane(origin=(0, 0, 10.6), x_dir=(-1, 0, 0), z_dir=(0, 0, -1))):
        with Locations((398.7, 19.8)):
            Circle(ESBO_O40_R)
    extrude(amount=RESSALTO_EXTRUS_O29_DEPTH)

    # Esboço41 → Ressalto-extrusão30 (add)
    with BuildSketch(Plane(origin=(0, 0, 4.6), x_dir=(-1, 0, 0), z_dir=(0, 0, -1))):
        with Locations((398.7, 19.8)):
            Circle(ESBO_O41_R)
    extrude(amount=-RESSALTO_EXTRUS_O30_DEPTH)

    # Filete8
    filete8_edges = [body_2.edges().sort_by_distance(p)[0] for p in [
        (-395.7, 19.8, 23.1),
    ]]
    fillet(filete8_edges, radius=FILETE8_R)

    # Esboço42 → Ressalto-extrusão31 (add)
    with BuildSketch(Plane.XY.offset(19.7)):
        with BuildLine():
            Line((-401.322721615, 20.626940949), (-402.67498238, 21.05330713))
            ThreePointArc((-402.67498238, 21.05330713), (-402.981119219, 21.326162864), (-402.980184512, 21.736247175))
            ThreePointArc((-402.980184512, 21.736247175), (-401.137076875, 23.816178393), (-398.441102958, 24.490629478))
            ThreePointArc((-398.441102958, 24.490629478), (-398.076922131, 24.302102712), (-397.9762544, 23.904565262))
            Line((-397.9762544, 23.904565262), (-398.222467511, 22.508221321))
            ThreePointArc((-398.222467511, 22.508221321), (-397.430191314, 22.239279791), (-396.755456352, 21.744543648))
            Line((-396.755456352, 21.744543648), (-395.474650348, 23.025349652))
            ThreePointArc((-395.474650348, 23.025349652), (-395.187573749, 23.840156974), (-395.642480013, 24.574584803))
            ThreePointArc((-395.642480013, 24.574584803), (-404.36966388, 19.8), (-395.642480013, 15.025415197))
            ThreePointArc((-395.642480013, 15.025415197), (-395.187573749, 15.759843026), (-395.474650348, 16.574650348))
            Line((-395.474650348, 16.574650348), (-396.755456352, 17.855456352))
            ThreePointArc((-396.755456352, 17.855456352), (-397.430191314, 17.360720209), (-398.222467511, 17.091778679))
            Line((-398.222467511, 17.091778679), (-397.9762544, 15.695434738))
            ThreePointArc((-397.9762544, 15.695434738), (-398.076922131, 15.297897288), (-398.441102958, 15.109370522))
            ThreePointArc((-398.441102958, 15.109370522), (-401.137076875, 15.783821607), (-402.980184512, 17.863752825))
            ThreePointArc((-402.980184512, 17.863752825), (-402.981119219, 18.273837136), (-402.67498238, 18.54669287))
            Line((-402.67498238, 18.54669287), (-401.322721615, 18.973059051))
            ThreePointArc((-401.322721615, 18.973059051), (-401.45, 19.8), (-401.322721615, 20.626940949))
        make_face()
    extrude(amount=RESSALTO_EXTRUS_O31_DEPTH)

    # Esboço43 → Ressalto-extrusão32 (add)
    with BuildSketch(Plane(origin=(0, 0, 4.6), x_dir=(-1, 0, 0), z_dir=(0, 0, -1))):
        Polygon((402.2, 5.8), (402.2, 3.8), (395.2, 3.8), (395.2, 5.8), (388.7, 5.8), (388.7, 29.8), (408.7, 29.8), (408.7, 5.8), align=None)
    extrude(amount=RESSALTO_EXTRUS_O32_DEPTH)

    # Filete9
    filete9_edges = [body_2.edges().sort_by_distance(p)[0] for p in [
        (-408.7, 5.8, 4),
        (-408.7, 29.8, 4),
        (-388.7, 29.8, 4),
        (-388.7, 5.8, 4),
    ]]
    fillet(filete9_edges, radius=FILETE9_R)

    # Filete10
    filete10_edges = [body_2.edges().sort_by_distance(p)[0] for p in [
        (-395.2, 5.8, 4),
        (-402.2, 5.8, 4),
    ]]
    fillet(filete10_edges, radius=FILETE10_R)


solid = body_2.part
